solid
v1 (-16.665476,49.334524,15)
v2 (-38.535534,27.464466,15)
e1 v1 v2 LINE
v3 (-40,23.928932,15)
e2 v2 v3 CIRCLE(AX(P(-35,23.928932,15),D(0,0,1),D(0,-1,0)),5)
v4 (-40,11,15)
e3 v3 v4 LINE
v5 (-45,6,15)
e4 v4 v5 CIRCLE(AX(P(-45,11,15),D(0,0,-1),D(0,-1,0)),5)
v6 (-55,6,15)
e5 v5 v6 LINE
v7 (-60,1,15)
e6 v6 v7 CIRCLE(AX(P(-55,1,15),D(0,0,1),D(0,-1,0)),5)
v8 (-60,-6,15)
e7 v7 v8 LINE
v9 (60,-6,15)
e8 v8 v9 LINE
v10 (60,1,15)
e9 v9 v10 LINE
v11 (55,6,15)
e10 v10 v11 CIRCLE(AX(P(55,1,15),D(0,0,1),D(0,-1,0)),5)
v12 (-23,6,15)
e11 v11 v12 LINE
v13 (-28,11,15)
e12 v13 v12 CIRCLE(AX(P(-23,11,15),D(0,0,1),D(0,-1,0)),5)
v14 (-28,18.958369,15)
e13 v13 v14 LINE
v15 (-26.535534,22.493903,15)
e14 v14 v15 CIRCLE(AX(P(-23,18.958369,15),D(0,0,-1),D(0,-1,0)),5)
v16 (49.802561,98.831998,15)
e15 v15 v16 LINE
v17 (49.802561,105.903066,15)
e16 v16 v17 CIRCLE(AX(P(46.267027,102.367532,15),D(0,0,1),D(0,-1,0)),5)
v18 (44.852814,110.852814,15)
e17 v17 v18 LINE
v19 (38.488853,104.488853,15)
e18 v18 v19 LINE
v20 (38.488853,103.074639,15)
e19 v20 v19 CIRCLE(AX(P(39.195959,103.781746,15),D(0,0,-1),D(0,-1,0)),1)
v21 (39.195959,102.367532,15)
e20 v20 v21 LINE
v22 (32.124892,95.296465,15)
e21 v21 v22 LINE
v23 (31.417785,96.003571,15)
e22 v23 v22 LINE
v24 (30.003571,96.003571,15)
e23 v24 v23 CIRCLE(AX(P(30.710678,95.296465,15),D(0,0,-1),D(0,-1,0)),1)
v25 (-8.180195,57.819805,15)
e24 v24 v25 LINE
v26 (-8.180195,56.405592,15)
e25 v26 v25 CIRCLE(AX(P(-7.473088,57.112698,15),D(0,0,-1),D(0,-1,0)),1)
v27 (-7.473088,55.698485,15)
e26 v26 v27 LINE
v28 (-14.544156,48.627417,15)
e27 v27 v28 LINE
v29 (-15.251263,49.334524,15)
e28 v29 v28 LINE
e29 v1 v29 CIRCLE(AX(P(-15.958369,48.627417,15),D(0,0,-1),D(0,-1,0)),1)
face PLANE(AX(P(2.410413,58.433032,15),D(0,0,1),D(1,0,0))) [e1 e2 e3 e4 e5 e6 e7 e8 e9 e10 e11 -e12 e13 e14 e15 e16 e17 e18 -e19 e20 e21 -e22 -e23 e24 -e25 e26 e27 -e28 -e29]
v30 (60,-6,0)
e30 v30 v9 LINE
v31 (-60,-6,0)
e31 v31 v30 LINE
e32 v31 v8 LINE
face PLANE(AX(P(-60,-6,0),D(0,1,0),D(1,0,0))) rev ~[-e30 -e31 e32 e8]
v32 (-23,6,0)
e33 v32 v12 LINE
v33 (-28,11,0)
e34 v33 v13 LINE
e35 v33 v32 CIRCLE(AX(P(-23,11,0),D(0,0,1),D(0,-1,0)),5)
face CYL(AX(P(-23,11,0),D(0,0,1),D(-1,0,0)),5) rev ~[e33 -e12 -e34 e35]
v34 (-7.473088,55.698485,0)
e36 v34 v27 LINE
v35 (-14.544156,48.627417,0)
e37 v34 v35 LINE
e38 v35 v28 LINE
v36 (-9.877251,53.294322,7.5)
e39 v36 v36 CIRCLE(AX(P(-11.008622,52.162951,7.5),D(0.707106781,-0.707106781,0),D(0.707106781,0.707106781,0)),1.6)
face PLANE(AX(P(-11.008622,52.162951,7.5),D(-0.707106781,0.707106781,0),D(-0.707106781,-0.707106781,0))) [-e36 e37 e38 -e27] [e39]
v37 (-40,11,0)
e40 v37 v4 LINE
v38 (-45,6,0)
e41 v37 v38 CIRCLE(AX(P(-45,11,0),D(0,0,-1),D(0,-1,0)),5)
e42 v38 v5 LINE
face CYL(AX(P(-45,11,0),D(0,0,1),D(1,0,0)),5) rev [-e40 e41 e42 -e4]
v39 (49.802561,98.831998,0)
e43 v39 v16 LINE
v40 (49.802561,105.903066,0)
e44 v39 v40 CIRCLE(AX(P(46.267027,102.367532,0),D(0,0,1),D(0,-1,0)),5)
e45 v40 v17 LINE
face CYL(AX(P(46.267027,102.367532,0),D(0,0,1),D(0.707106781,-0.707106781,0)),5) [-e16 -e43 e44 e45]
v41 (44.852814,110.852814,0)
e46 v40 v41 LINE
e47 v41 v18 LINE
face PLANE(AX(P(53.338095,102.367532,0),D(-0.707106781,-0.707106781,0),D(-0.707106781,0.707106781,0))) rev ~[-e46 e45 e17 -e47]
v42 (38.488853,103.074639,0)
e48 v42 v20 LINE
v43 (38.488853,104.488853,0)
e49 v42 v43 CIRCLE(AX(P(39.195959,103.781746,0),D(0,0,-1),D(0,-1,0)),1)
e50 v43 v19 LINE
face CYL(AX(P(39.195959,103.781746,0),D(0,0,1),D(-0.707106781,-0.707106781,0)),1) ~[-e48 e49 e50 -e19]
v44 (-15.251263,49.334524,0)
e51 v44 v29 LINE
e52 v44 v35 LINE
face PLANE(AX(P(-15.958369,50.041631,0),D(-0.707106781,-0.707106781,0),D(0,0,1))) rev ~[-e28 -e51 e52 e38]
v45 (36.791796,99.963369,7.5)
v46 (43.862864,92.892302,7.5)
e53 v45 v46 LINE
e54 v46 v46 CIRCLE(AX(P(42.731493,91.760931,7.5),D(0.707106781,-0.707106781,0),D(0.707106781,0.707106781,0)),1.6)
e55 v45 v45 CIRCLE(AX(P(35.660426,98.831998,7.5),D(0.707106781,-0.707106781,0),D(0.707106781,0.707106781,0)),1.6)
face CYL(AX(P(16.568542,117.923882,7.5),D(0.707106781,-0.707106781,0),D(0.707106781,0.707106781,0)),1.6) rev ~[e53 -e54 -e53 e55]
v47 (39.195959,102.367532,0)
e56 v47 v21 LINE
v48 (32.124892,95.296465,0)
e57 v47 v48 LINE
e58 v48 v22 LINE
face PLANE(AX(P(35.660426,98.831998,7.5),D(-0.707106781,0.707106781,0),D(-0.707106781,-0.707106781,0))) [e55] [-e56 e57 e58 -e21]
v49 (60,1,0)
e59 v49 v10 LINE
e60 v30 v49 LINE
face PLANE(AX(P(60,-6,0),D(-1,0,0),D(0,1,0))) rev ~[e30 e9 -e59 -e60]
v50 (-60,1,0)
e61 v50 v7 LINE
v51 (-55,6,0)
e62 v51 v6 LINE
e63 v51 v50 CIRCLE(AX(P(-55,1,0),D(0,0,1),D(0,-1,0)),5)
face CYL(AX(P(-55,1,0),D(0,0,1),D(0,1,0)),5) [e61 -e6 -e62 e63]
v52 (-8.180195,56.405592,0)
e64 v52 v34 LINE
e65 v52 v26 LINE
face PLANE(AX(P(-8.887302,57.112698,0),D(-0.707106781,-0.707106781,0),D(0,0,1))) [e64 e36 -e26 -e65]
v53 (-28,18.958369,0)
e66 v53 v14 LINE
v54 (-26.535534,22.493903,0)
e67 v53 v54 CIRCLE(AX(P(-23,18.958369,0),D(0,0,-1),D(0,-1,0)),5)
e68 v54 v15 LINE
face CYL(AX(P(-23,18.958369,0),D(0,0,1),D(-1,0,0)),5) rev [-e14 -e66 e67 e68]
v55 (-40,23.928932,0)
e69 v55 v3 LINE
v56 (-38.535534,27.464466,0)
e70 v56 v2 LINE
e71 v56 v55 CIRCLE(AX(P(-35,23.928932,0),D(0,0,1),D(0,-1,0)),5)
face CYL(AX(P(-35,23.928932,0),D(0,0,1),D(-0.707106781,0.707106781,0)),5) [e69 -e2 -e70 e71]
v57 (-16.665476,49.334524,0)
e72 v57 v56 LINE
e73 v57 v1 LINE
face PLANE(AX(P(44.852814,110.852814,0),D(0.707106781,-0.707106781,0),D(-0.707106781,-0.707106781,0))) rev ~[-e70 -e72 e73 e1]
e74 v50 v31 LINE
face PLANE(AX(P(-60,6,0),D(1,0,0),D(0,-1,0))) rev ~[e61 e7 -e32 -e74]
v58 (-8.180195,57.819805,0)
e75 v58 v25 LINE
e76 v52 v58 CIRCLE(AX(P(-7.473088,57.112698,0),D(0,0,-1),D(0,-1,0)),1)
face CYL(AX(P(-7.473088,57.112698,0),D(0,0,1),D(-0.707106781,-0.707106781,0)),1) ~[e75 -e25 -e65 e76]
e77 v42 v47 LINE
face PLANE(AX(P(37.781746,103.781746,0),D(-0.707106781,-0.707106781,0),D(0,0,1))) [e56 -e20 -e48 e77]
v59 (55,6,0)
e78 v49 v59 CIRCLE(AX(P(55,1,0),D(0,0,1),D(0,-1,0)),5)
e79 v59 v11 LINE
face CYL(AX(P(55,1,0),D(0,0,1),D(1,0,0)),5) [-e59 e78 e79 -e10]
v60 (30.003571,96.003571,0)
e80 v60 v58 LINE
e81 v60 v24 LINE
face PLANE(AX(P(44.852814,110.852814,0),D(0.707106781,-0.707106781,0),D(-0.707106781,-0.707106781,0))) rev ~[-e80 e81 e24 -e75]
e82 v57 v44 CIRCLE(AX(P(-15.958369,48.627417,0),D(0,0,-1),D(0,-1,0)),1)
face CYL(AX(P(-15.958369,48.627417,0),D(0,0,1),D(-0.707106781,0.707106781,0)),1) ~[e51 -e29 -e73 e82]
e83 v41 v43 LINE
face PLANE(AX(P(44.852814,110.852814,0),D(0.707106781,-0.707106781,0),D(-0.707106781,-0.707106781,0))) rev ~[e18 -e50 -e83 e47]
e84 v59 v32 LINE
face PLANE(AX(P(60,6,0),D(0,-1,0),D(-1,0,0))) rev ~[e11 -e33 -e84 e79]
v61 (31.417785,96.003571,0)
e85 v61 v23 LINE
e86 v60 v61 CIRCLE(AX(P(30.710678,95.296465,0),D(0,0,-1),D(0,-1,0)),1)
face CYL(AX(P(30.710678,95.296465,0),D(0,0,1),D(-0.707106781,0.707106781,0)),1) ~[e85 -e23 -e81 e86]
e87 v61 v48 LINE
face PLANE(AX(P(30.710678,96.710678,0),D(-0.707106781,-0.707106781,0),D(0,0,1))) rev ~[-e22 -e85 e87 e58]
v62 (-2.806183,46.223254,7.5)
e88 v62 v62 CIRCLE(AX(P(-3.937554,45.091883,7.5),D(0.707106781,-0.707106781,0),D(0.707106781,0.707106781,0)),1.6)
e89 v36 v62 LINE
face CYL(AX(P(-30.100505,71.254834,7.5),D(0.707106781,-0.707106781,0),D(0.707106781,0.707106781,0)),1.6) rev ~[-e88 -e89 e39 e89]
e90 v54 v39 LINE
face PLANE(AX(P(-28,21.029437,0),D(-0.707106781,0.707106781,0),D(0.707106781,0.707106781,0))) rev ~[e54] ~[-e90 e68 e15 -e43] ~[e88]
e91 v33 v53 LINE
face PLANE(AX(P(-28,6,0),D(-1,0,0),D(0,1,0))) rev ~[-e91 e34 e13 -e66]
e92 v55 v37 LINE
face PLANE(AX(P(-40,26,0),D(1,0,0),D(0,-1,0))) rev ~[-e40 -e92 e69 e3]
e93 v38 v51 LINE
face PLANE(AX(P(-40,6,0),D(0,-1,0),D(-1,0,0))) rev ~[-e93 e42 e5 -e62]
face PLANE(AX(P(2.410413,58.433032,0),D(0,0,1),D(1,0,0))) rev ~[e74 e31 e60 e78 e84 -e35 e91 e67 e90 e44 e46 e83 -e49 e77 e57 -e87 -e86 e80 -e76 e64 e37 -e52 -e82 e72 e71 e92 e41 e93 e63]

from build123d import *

# Parameters (mm, degrees)
F1_DEPTH = 15
F2_R     = 5
F3_W     = 10
F3_H     = 15
F4_DEPTH = 2
F5_D     = 3.2
F5_DEPTH = 25
F5_TIP   = 0.9613769904
F6_R     = 1


with BuildPart() as f1:
    # F0 (on Top) → F1 (new body)
    with BuildSketch(Plane.XY):
        Polygon((-40, 6), (-28, 6), (-28, 21.0294372515), (53.3380951166, 102.3675323681), (44.8528137424, 110.8528137424), (-40, 26), align=None)
        Polygon((-60, -6), (60, -6), (60, 6), (-28, 6), (-40, 6), (-60, 6), align=None)
    extrude(amount=F1_DEPTH)

    # F2
    f2_edges = [f1.edges().sort_by_distance(p)[0] for p in [
        (-40, 6, 7.5),
        (-28, 6, 7.5),
        (-60, 6, 7.5),
        (60, 6, 7.5),
        (53.338095, 102.367532, 7.5),
        (-40, 26, 7.5),
        (-28, 21.029437, 7.5),
    ]]
    fillet(f2_edges, radius=F2_R)

    # F3 (on face) → F4 (cut)
    with BuildSketch(Plane(origin=(-33, 33, 0), x_dir=(-0.7071067812, -0.7071067812, 0), z_dir=(-0.7071067812, 0.7071067812, 0))):
        with Locations((-95.1005050634, 7.5)):
            Rectangle(F3_W, F3_H)
        with Locations((-29.1005050634, 7.5)):
            Rectangle(F3_W, F3_H)
    extrude(amount=-F4_DEPTH, mode=Mode.SUBTRACT)

    # F5
    with Locations(Plane(origin=(-33, 33, 0), x_dir=(-0.7071067812, -0.7071067812, 0), z_dir=(-0.7071067812, 0.7071067812, 0))):
        with Locations((-95.1005050634, 7.5), (-29.1005050634, 7.5)):
            Hole(F5_D / 2, depth=F5_DEPTH)
            with Locations((0, 0, -(F5_DEPTH + F5_TIP / 2))):  # 118° drill point
                Cone(0, F5_D / 2, F5_TIP, mode=Mode.SUBTRACT)

    # F6
    f6_edges = [f1.edges().sort_by_distance(p)[0] for p in [
        (37.781746, 103.781746, 7.5),
        (30.710678, 96.710678, 7.5),
        (-8.887302, 57.112698, 7.5),
        (-15.958369, 50.041631, 7.5),
    ]]
    fillet(f6_edges, radius=F6_R)


solid = f1.part
